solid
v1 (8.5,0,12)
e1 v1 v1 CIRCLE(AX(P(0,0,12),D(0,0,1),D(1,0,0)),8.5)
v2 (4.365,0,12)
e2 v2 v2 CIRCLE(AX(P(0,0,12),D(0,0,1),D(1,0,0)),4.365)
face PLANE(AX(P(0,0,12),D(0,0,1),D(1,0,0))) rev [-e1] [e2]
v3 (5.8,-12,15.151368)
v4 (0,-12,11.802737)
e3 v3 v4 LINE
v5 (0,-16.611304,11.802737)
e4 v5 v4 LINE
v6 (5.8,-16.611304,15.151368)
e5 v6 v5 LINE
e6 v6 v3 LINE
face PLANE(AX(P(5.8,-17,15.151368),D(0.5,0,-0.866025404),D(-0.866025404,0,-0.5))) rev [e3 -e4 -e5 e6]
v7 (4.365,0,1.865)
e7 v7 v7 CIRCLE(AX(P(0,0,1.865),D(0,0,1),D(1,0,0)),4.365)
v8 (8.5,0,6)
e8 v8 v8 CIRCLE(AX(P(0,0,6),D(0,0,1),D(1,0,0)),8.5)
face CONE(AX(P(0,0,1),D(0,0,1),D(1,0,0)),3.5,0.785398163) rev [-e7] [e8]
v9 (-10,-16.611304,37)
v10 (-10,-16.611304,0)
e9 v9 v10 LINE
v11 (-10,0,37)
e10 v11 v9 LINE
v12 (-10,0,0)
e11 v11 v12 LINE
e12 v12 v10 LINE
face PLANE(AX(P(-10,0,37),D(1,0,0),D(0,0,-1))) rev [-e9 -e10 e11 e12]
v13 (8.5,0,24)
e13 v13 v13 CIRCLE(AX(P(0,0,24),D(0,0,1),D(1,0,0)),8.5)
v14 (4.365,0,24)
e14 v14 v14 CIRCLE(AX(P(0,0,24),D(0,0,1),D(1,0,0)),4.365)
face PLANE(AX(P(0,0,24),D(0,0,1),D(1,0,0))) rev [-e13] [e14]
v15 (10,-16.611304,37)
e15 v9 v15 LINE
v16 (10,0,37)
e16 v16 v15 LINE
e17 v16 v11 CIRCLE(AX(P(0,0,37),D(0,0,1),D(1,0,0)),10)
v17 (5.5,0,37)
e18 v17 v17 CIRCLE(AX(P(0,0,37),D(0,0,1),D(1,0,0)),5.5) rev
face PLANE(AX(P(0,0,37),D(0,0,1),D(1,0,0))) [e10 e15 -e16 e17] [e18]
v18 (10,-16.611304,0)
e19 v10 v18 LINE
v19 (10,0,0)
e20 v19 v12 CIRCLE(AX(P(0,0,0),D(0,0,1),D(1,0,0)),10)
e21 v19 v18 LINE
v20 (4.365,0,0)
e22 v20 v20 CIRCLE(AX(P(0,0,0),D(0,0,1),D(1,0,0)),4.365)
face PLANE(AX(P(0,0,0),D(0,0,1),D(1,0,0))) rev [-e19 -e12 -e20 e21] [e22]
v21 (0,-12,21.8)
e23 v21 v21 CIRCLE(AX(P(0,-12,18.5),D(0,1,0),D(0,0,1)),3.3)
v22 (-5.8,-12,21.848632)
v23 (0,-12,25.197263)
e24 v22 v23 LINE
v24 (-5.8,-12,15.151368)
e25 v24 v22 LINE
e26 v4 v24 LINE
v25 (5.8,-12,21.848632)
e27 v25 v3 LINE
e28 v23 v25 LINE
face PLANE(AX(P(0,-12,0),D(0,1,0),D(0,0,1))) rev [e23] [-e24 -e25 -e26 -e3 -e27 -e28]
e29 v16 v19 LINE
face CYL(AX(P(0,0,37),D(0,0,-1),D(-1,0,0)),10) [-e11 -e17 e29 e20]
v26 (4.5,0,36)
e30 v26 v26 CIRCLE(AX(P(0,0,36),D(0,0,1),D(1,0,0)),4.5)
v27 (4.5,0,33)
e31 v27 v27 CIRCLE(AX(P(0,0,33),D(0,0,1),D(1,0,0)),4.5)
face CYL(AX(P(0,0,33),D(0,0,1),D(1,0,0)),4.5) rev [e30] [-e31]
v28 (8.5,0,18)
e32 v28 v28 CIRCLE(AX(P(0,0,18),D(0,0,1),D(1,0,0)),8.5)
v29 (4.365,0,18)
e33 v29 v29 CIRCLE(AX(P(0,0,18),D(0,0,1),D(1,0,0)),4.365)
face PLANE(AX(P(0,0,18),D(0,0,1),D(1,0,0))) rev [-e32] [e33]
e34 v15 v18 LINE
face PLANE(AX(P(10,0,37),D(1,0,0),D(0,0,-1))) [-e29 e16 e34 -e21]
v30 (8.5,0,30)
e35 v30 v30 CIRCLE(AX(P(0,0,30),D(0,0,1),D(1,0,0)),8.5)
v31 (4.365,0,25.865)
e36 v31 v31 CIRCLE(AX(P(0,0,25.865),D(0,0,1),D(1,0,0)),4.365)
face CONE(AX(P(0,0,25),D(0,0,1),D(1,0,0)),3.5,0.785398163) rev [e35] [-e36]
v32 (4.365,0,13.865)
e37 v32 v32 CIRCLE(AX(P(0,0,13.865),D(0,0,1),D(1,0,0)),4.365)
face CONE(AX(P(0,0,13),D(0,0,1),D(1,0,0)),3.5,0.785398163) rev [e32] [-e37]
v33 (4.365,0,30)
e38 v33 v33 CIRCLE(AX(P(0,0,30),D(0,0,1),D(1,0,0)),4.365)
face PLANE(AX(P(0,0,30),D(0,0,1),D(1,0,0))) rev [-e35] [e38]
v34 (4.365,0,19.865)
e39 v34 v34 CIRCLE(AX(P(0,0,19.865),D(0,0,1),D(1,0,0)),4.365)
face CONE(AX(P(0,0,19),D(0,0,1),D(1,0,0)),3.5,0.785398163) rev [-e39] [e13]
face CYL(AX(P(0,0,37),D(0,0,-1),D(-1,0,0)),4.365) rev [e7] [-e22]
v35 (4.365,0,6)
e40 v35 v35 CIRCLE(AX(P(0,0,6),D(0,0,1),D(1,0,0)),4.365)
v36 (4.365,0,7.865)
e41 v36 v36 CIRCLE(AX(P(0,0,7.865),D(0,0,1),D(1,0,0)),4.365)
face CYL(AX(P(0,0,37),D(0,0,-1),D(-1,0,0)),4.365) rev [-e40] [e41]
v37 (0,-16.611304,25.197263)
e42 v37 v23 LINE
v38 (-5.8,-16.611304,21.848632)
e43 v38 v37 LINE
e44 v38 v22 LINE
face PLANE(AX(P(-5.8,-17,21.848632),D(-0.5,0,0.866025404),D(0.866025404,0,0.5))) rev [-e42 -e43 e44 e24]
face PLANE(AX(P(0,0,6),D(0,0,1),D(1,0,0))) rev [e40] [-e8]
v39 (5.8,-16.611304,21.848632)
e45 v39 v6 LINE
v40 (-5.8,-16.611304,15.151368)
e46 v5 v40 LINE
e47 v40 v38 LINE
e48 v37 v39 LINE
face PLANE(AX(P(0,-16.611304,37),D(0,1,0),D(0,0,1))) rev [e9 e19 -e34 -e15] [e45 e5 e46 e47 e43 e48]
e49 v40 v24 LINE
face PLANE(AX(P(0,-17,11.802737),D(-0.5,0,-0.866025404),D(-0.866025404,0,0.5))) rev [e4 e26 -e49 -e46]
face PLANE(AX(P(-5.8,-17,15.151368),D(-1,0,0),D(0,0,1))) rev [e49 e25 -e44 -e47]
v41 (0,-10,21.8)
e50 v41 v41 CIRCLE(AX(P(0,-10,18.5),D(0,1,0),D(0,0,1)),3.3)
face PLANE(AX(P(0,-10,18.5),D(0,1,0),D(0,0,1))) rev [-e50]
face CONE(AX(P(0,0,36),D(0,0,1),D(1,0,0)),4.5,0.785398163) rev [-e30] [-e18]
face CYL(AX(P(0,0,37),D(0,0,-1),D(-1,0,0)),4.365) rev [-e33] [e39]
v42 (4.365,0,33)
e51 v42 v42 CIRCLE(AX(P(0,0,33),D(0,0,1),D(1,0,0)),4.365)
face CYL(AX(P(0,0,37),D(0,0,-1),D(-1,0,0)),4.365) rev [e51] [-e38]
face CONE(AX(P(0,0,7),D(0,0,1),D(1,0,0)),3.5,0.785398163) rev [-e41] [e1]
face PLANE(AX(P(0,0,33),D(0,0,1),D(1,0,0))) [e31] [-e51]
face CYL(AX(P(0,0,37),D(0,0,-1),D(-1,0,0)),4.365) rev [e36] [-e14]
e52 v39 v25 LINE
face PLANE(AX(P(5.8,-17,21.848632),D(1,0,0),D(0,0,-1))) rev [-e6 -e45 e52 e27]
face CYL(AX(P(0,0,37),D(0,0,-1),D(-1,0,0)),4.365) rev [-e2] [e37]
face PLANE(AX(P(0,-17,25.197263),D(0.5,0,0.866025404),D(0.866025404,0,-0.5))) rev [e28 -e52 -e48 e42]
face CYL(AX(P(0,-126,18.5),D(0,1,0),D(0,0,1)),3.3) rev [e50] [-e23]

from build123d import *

# Parameters (mm, degrees)
CROQUIS1_R              = 10
CROQUIS1_R_2            = 4.365
SALIENTE_EXTRUIR1_DEPTH = 37
CORTAR_EXTRUIR1_START   = 1
CROQUIS1_3_R            = 8.5
CORTAR_EXTRUIR1_DEPTH   = 5
CORTAR_EXTRUIR2_START   = 7
CROQUIS1_4_R            = 8.5
CORTAR_EXTRUIR2_DEPTH   = 5
CORTAR_EXTRUIR3_START   = 13
CROQUIS1_5_R            = 8.5
CORTAR_EXTRUIR3_DEPTH   = 5
CORTAR_EXTRUIR4_START   = 19
CROQUIS1_6_R            = 8.5
CORTAR_EXTRUIR4_DEPTH   = 5
CORTAR_EXTRUIR5_START   = 25
CROQUIS1_7_R            = 8.5
CORTAR_EXTRUIR5_DEPTH   = 5
CHAFL_N1_SIZE           = 5
CORTAR_EXTRUIR6_START   = 37
CROQUIS4_R              = 4.5
CORTAR_EXTRUIR6_DEPTH   = 4
CHAFL_N2_SIZE           = 1
SALIENTE_EXTRUIR2_DEPTH = 37
CORTAR_EXTRUIR7_START   = -10
CROQUIS6_R              = 3.3
CORTAR_EXTRUIR7_DEPTH   = 116
CORTAR_EXTRUIR8_START   = -12
CORTAR_EXTRUIR8_DEPTH   = 5


with BuildPart() as part:
    # Croquis1 → Saliente-Extruir1 (new body)
    with BuildSketch(Plane.XY):
        Circle(CROQUIS1_R)
        Circle(CROQUIS1_R_2, mode=Mode.SUBTRACT)
    extrude(amount=SALIENTE_EXTRUIR1_DEPTH)

    # Croquis1<3> → Cortar-Extruir1 (cut)
    with BuildSketch(Plane.XY.offset(CORTAR_EXTRUIR1_START)):
        Circle(CROQUIS1_3_R)
    extrude(amount=CORTAR_EXTRUIR1_DEPTH, mode=Mode.SUBTRACT)

    # Croquis1<4> → Cortar-Extruir2 (cut)
    with BuildSketch(Plane.XY.offset(CORTAR_EXTRUIR2_START)):
        Circle(CROQUIS1_4_R)
    extrude(amount=CORTAR_EXTRUIR2_DEPTH, mode=Mode.SUBTRACT)

    # Croquis1<5> → Cortar-Extruir3 (cut)
    with BuildSketch(Plane.XY.offset(CORTAR_EXTRUIR3_START)):
        Circle(CROQUIS1_5_R)
    extrude(amount=CORTAR_EXTRUIR3_DEPTH, mode=Mode.SUBTRACT)

    # Croquis1<6> → Cortar-Extruir4 (cut)
    with BuildSketch(Plane.XY.offset(CORTAR_EXTRUIR4_START)):
        Circle(CROQUIS1_6_R)
    extrude(amount=CORTAR_EXTRUIR4_DEPTH, mode=Mode.SUBTRACT)

    # Croquis1<7> → Cortar-Extruir5 (cut)
    with BuildSketch(Plane.XY.offset(CORTAR_EXTRUIR5_START)):
        Circle(CROQUIS1_7_R)
    extrude(amount=CORTAR_EXTRUIR5_DEPTH, mode=Mode.SUBTRACT)

    # Chaflán1
    # the kernel refuses this chamfer: 5 mm, written as the material it adds along each edge
    with BuildSketch(Plane(origin=(0, 0, 13), x_dir=(1, 0, 0), z_dir=(0, -1, 0))) as chafl_n1_piece_1_section:
        Polygon((8.5 - CHAFL_N1_SIZE, 0), (8.5, CHAFL_N1_SIZE), (8.5, 0), align=None)
    chafl_n1_piece_1 = revolve(axis=Axis((0, 0, 13), (0, 0, 1)), mode=Mode.PRIVATE)
    chafl_n1_piece_1 = chafl_n1_piece_1 - Plane(origin=(0, 0, 15.944314862), x_dir=(1, 0, 0), z_dir=(0, 0, -1)) * Cylinder(4.365, 34, mode=Mode.PRIVATE)
    add(chafl_n1_piece_1)
    with BuildSketch(Plane(origin=(0, 0, 7), x_dir=(1, 0, 0), z_dir=(0, -1, 0))) as chafl_n1_piece_2_section:
        Polygon((8.5 - CHAFL_N1_SIZE, 0), (8.5, CHAFL_N1_SIZE), (8.5, 0), align=None)
    chafl_n1_piece_2 = revolve(axis=Axis((0, 0, 7), (0, 0, 1)), mode=Mode.PRIVATE)
    chafl_n1_piece_2 = chafl_n1_piece_2 - Plane(origin=(0, 0, 9.944314862), x_dir=(1, 0, 0), z_dir=(0, 0, -1)) * Cylinder(4.365, 34, mode=Mode.PRIVATE)
    add(chafl_n1_piece_2)
    with BuildSketch(Plane(origin=(0, 0, 1), x_dir=(1, 0, 0), z_dir=(0, -1, 0))) as chafl_n1_piece_3_section:
        Polygon((8.5 - CHAFL_N1_SIZE, 0), (8.5, CHAFL_N1_SIZE), (8.5, 0), align=None)
    chafl_n1_piece_3 = revolve(axis=Axis((0, 0, 1), (0, 0, 1)), mode=Mode.PRIVATE)
    chafl_n1_piece_3 = chafl_n1_piece_3 - Plane(origin=(0, 0, 3.944314862), x_dir=(1, 0, 0), z_dir=(0, 0, -1)) * Cylinder(4.365, 34, mode=Mode.PRIVATE)
    add(chafl_n1_piece_3)
    with BuildSketch(Plane(origin=(0, 0, 25), x_dir=(1, 0, 0), z_dir=(0, -1, 0))) as chafl_n1_piece_4_section:
        Polygon((8.5, CHAFL_N1_SIZE), (8.5 - CHAFL_N1_SIZE, 0), (8.5, 0), align=None)
    chafl_n1_piece_4 = revolve(axis=Axis((0, 0, 25), (0, 0, 1)), mode=Mode.PRIVATE)
    chafl_n1_piece_4 = chafl_n1_piece_4 - Plane(origin=(0, 0, 27.944314862), x_dir=(1, 0, 0), z_dir=(0, 0, -1)) * Cylinder(4.365, 34, mode=Mode.PRIVATE)
    add(chafl_n1_piece_4)
    with BuildSketch(Plane(origin=(0, 0, 19), x_dir=(1, 0, 0), z_dir=(0, -1, 0))) as chafl_n1_piece_5_section:
        Polygon((8.5, CHAFL_N1_SIZE), (8.5 - CHAFL_N1_SIZE, 0), (8.5, 0), align=None)
    chafl_n1_piece_5 = revolve(axis=Axis((0, 0, 19), (0, 0, 1)), mode=Mode.PRIVATE)
    chafl_n1_piece_5 = chafl_n1_piece_5 - Plane(origin=(0, 0, 21.944314862), x_dir=(1, 0, 0), z_dir=(0, 0, -1)) * Cylinder(4.365, 34, mode=Mode.PRIVATE)
    add(chafl_n1_piece_5)

    # Croquis4 → Cortar-Extruir6 (cut)
    with BuildSketch(Plane.XY.offset(CORTAR_EXTRUIR6_START)):
        Circle(CROQUIS4_R)
    extrude(amount=-CORTAR_EXTRUIR6_DEPTH, mode=Mode.SUBTRACT)

    # Chaflán2
    chafl_n2_edges = [part.edges().sort_by_distance(p)[0] for p in [
        (-4.5, 0, 37),
    ]]
    chamfer(chafl_n2_edges, length=CHAFL_N2_SIZE)

    # Croquis5 → Saliente-Extruir2 (add)
    with BuildSketch(Plane.XY):
        with BuildLine():
            Line((10, -16.611303619), (10, 0))
            ThreePointArc((10, 0), (0, -10), (-10, 0))
            Line((-10, 0), (-10, -16.611303619))
            Line((-10, -16.611303619), (10, -16.611303619))
        make_face()
    extrude(amount=SALIENTE_EXTRUIR2_DEPTH)

    # Croquis6 → Cortar-Extruir7 (cut)
    with BuildSketch(Plane(origin=(0, 0, 0), x_dir=(1, 0, 0), z_dir=(0, 1, 0)).offset(CORTAR_EXTRUIR7_START)):
        with Locations(Location((0, -18.5, 0), (0, 0, 270))):
            Circle(CROQUIS6_R)
    extrude(amount=-CORTAR_EXTRUIR7_DEPTH, mode=Mode.SUBTRACT)

    # Croquis6<3> → Cortar-Extruir8 (cut)
    with BuildSketch(Plane(origin=(0, 0, 0), x_dir=(1, 0, 0), z_dir=(0, 1, 0)).offset(CORTAR_EXTRUIR8_START)):
        Polygon((0, -25.197263123), (5.8, -21.848631561), (5.8, -15.151368439), (0, -11.802736877), (-5.8, -15.151368439), (-5.8, -21.848631561), align=None)
    extrude(amount=-CORTAR_EXTRUIR8_DEPTH, mode=Mode.SUBTRACT)


solid = part.part
